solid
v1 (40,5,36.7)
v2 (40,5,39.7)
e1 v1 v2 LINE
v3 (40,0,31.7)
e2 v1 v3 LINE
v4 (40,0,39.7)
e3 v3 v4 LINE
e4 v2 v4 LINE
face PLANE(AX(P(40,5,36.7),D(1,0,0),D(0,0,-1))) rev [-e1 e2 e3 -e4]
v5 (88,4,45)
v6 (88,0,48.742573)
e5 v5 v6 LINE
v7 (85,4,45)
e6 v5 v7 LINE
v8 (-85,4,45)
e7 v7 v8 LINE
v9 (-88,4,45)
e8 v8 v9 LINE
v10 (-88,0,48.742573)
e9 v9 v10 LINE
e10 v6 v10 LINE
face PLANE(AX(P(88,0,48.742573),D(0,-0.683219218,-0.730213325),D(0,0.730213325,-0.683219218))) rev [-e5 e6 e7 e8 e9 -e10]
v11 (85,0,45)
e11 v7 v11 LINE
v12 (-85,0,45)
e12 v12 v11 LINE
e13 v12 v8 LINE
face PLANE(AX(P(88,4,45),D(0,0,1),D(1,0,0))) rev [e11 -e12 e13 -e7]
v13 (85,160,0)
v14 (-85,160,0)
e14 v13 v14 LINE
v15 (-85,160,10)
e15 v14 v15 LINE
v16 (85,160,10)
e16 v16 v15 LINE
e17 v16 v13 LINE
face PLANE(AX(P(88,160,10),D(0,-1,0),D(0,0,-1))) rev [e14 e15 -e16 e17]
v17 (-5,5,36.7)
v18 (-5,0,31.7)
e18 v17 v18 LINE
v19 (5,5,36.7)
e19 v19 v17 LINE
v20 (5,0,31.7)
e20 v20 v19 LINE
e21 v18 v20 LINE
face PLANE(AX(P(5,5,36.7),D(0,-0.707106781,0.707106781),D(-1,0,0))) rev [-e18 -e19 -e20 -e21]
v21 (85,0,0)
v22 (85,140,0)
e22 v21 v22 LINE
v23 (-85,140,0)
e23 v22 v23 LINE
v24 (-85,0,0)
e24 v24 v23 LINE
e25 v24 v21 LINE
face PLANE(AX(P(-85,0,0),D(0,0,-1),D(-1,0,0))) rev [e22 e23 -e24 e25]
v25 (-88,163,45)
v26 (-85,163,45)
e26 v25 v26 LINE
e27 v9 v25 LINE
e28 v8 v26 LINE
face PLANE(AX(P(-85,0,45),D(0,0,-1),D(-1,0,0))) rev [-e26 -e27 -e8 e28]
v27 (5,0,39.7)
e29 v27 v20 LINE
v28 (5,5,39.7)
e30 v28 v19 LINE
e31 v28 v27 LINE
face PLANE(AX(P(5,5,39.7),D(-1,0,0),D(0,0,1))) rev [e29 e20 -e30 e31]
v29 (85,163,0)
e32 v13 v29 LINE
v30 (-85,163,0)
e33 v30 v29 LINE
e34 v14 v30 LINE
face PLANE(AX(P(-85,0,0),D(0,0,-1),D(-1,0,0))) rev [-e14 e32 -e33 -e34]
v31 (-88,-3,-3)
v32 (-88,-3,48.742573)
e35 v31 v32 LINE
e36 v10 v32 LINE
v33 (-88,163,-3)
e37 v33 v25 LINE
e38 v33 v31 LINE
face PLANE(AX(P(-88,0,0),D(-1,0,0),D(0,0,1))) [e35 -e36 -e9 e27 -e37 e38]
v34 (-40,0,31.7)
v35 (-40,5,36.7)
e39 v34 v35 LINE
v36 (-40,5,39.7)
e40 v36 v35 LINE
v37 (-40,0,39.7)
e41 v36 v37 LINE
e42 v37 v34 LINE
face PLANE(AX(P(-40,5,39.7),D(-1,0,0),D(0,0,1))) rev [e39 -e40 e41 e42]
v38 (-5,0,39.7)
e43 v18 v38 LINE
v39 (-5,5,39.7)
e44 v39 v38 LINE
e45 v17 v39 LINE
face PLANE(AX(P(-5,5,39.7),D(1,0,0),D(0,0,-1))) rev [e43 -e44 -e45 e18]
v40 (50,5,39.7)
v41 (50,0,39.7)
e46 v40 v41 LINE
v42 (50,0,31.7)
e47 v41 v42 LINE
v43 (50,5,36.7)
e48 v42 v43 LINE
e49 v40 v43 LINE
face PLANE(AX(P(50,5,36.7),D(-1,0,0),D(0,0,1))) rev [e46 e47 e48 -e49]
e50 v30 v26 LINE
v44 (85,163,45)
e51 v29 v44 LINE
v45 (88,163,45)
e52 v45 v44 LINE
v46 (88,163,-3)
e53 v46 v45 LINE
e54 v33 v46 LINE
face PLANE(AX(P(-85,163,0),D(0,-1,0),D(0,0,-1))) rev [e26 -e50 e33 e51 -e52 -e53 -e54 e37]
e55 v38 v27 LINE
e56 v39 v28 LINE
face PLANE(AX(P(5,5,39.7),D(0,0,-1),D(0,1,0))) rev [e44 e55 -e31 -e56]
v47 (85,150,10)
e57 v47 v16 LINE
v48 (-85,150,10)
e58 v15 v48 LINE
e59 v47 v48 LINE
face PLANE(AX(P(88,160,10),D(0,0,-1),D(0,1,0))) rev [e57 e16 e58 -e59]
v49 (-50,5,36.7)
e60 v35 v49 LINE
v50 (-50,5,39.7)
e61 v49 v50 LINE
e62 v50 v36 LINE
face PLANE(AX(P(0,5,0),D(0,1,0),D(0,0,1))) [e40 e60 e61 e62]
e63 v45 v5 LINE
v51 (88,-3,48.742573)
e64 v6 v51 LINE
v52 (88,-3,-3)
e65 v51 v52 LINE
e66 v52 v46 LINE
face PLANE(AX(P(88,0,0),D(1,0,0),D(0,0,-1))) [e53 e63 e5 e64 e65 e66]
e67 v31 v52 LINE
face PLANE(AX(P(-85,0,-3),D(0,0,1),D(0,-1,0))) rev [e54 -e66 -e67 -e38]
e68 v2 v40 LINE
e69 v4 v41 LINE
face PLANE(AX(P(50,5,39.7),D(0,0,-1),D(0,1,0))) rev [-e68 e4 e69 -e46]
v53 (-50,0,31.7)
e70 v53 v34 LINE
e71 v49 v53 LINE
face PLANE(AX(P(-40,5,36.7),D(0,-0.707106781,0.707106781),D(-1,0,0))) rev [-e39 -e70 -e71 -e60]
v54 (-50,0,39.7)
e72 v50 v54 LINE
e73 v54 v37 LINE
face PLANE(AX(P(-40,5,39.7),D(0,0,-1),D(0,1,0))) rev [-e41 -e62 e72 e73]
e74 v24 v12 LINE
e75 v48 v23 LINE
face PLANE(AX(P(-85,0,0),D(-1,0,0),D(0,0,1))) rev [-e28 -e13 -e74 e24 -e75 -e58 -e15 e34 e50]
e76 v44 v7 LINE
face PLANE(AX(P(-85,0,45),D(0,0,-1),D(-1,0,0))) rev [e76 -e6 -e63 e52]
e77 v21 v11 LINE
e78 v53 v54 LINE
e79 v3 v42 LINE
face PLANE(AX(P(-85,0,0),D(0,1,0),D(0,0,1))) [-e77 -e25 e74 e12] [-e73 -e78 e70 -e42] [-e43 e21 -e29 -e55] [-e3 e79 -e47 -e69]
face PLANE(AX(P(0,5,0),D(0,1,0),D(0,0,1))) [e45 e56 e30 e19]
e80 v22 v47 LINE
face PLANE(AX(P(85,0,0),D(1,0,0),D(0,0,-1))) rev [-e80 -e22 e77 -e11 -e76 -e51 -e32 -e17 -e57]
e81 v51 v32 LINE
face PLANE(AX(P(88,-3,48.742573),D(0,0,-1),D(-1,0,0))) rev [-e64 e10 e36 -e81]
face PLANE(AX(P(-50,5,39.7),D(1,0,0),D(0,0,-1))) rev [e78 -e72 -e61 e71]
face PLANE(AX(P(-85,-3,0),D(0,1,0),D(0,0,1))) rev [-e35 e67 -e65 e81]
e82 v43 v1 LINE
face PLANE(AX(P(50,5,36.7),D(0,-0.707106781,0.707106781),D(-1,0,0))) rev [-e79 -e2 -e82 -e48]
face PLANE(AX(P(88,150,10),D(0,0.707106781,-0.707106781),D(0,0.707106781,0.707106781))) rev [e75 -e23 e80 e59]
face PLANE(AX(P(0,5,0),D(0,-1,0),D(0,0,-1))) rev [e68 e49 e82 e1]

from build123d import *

# Parameters (mm, degrees)
BOSS_EXTRUDE1_DEPTH             = 85
BOSS_EXTRUDE1_DEPTH_BACK        = 85
BOSS_EXTRUDE2_START             = -85
SKETCH1_4_W                     = 45
SKETCH1_4_H                     = 163
BOSS_EXTRUDE2_DEPTH             = 3
BOSS_EXTRUDE3_START             = 85
SKETCH1_5_W                     = 45
SKETCH1_5_H                     = 163
BOSS_EXTRUDE3_DEPTH             = 3
BOSS_EXTRUDE4_REACH             = 192.625
BOSS_EXTRUDE4_DIRECTION_2_REACH = 192.625
SKETCH5_W                       = 10
SKETCH5_H                       = 3
BOSS_EXTRUDE7_DEPTH             = 5
BOSS_EXTRUDE8_DEPTH             = 88
BOSS_EXTRUDE8_DEPTH_BACK        = 88
CHAMFER1_SIZE                   = 5


with BuildPart() as part:
    # Sketch1 → Boss-Extrude1 (new, two sides: drawn at the far end of the back side and taken through both)
    with BuildSketch(Plane(origin=(0, 0, 0), x_dir=(0, 0, -1), z_dir=(1, 0, 0)).offset(-BOSS_EXTRUDE1_DEPTH_BACK)):
        Polygon((-45, -3), (-45, 0), (0, 0), (0, 163), (3, 163), (3, -3), align=None)
    extrude(amount=BOSS_EXTRUDE1_DEPTH + BOSS_EXTRUDE1_DEPTH_BACK)

    # Sketch1<4> → Boss-Extrude2 (add)
    with BuildSketch(Plane(origin=(0, 0, 0), x_dir=(0, 0, -1), z_dir=(1, 0, 0)).offset(BOSS_EXTRUDE2_START)):
        with Locations((-22.5, 81.5)):
            Rectangle(SKETCH1_4_W, SKETCH1_4_H)
        Polygon((-45, -3), (-45, 0), (0, 0), (0, 163), (3, 163), (3, -3), align=None)
    extrude(amount=-BOSS_EXTRUDE2_DEPTH)

    # Sketch1<5> → Boss-Extrude3 (add)
    with BuildSketch(Plane(origin=(0, 0, 0), x_dir=(0, 0, -1), z_dir=(1, 0, 0)).offset(BOSS_EXTRUDE3_START)):
        Polygon((-45, -3), (-45, 0), (0, 0), (0, 163), (3, 163), (3, -3), align=None)
        with Locations((-22.5, 81.5)):
            Rectangle(SKETCH1_5_W, SKETCH1_5_H)
    extrude(amount=BOSS_EXTRUDE3_DEPTH)

    # Sketch2 → Boss-Extrude4 (add, up to next)
    with BuildSketch(Plane(origin=(0, 0, 0), x_dir=(0, 0, -1), z_dir=(1, 0, 0)), mode=Mode.PRIVATE) as boss_extrude4_sk1:
        Polygon((-10, 160), (-10, 150), (0, 140), (0, 160), align=None)
    boss_extrude4_tool1 = extrude(boss_extrude4_sk1.sketch, amount=BOSS_EXTRUDE4_REACH, mode=Mode.PRIVATE) - part.part
    add(boss_extrude4_tool1.solids().sort_by_distance((0, 152.222222, 4.444444))[0])

    # Sketch2 → Boss-Extrude4 direction 2 (add, up to next)
    with BuildSketch(Plane(origin=(0, 0, 0), x_dir=(0, 0, -1), z_dir=(1, 0, 0)), mode=Mode.PRIVATE) as boss_extrude4_direction_2_sk1:
        Polygon((-10, 160), (-10, 150), (0, 140), (0, 160), align=None)
    boss_extrude4_direction_2_tool1 = extrude(boss_extrude4_direction_2_sk1.sketch, amount=-BOSS_EXTRUDE4_DIRECTION_2_REACH, mode=Mode.PRIVATE) - part.part
    add(boss_extrude4_direction_2_tool1.solids().sort_by_distance((0, 152.222222, 4.444444))[0])

    # Sketch5 → Boss-Extrude7 (add)
    with BuildSketch(Plane(origin=(0, 0, 0), x_dir=(1, 0, 0), z_dir=(0, 1, 0))):
        with Locations((-45, -38.2)):
            Rectangle(SKETCH5_W, SKETCH5_H)
        with Locations((45, -38.2)):
            Rectangle(SKETCH5_W, SKETCH5_H)
        with Locations((0, -38.2)):
            Rectangle(SKETCH5_W, SKETCH5_H)
    extrude(amount=BOSS_EXTRUDE7_DEPTH)

    # Sketch4 → Boss-Extrude8 (add, two sides: drawn at the far end of the back side and taken through both)
    with BuildSketch(Plane(origin=(0, 0, 0), x_dir=(0, 0, -1), z_dir=(1, 0, 0)).offset(-BOSS_EXTRUDE8_DEPTH_BACK)):
        Polygon((-45, -3), (-48.742573267, -3), (-48.742573267, 0), (-45, 4), (-45, 0), align=None)
    extrude(amount=BOSS_EXTRUDE8_DEPTH + BOSS_EXTRUDE8_DEPTH_BACK)

    # Chamfer1
    chamfer1_edges = [part.edges().sort_by_distance(p)[0] for p in [
        (0, 0, 36.7),
        (45, 0, 36.7),
        (-45, 0, 36.7),
    ]]
    chamfer(chamfer1_edges, length=CHAMFER1_SIZE - 0.0001)  # a hair under: the kernel refuses the full size


solid = part.part
